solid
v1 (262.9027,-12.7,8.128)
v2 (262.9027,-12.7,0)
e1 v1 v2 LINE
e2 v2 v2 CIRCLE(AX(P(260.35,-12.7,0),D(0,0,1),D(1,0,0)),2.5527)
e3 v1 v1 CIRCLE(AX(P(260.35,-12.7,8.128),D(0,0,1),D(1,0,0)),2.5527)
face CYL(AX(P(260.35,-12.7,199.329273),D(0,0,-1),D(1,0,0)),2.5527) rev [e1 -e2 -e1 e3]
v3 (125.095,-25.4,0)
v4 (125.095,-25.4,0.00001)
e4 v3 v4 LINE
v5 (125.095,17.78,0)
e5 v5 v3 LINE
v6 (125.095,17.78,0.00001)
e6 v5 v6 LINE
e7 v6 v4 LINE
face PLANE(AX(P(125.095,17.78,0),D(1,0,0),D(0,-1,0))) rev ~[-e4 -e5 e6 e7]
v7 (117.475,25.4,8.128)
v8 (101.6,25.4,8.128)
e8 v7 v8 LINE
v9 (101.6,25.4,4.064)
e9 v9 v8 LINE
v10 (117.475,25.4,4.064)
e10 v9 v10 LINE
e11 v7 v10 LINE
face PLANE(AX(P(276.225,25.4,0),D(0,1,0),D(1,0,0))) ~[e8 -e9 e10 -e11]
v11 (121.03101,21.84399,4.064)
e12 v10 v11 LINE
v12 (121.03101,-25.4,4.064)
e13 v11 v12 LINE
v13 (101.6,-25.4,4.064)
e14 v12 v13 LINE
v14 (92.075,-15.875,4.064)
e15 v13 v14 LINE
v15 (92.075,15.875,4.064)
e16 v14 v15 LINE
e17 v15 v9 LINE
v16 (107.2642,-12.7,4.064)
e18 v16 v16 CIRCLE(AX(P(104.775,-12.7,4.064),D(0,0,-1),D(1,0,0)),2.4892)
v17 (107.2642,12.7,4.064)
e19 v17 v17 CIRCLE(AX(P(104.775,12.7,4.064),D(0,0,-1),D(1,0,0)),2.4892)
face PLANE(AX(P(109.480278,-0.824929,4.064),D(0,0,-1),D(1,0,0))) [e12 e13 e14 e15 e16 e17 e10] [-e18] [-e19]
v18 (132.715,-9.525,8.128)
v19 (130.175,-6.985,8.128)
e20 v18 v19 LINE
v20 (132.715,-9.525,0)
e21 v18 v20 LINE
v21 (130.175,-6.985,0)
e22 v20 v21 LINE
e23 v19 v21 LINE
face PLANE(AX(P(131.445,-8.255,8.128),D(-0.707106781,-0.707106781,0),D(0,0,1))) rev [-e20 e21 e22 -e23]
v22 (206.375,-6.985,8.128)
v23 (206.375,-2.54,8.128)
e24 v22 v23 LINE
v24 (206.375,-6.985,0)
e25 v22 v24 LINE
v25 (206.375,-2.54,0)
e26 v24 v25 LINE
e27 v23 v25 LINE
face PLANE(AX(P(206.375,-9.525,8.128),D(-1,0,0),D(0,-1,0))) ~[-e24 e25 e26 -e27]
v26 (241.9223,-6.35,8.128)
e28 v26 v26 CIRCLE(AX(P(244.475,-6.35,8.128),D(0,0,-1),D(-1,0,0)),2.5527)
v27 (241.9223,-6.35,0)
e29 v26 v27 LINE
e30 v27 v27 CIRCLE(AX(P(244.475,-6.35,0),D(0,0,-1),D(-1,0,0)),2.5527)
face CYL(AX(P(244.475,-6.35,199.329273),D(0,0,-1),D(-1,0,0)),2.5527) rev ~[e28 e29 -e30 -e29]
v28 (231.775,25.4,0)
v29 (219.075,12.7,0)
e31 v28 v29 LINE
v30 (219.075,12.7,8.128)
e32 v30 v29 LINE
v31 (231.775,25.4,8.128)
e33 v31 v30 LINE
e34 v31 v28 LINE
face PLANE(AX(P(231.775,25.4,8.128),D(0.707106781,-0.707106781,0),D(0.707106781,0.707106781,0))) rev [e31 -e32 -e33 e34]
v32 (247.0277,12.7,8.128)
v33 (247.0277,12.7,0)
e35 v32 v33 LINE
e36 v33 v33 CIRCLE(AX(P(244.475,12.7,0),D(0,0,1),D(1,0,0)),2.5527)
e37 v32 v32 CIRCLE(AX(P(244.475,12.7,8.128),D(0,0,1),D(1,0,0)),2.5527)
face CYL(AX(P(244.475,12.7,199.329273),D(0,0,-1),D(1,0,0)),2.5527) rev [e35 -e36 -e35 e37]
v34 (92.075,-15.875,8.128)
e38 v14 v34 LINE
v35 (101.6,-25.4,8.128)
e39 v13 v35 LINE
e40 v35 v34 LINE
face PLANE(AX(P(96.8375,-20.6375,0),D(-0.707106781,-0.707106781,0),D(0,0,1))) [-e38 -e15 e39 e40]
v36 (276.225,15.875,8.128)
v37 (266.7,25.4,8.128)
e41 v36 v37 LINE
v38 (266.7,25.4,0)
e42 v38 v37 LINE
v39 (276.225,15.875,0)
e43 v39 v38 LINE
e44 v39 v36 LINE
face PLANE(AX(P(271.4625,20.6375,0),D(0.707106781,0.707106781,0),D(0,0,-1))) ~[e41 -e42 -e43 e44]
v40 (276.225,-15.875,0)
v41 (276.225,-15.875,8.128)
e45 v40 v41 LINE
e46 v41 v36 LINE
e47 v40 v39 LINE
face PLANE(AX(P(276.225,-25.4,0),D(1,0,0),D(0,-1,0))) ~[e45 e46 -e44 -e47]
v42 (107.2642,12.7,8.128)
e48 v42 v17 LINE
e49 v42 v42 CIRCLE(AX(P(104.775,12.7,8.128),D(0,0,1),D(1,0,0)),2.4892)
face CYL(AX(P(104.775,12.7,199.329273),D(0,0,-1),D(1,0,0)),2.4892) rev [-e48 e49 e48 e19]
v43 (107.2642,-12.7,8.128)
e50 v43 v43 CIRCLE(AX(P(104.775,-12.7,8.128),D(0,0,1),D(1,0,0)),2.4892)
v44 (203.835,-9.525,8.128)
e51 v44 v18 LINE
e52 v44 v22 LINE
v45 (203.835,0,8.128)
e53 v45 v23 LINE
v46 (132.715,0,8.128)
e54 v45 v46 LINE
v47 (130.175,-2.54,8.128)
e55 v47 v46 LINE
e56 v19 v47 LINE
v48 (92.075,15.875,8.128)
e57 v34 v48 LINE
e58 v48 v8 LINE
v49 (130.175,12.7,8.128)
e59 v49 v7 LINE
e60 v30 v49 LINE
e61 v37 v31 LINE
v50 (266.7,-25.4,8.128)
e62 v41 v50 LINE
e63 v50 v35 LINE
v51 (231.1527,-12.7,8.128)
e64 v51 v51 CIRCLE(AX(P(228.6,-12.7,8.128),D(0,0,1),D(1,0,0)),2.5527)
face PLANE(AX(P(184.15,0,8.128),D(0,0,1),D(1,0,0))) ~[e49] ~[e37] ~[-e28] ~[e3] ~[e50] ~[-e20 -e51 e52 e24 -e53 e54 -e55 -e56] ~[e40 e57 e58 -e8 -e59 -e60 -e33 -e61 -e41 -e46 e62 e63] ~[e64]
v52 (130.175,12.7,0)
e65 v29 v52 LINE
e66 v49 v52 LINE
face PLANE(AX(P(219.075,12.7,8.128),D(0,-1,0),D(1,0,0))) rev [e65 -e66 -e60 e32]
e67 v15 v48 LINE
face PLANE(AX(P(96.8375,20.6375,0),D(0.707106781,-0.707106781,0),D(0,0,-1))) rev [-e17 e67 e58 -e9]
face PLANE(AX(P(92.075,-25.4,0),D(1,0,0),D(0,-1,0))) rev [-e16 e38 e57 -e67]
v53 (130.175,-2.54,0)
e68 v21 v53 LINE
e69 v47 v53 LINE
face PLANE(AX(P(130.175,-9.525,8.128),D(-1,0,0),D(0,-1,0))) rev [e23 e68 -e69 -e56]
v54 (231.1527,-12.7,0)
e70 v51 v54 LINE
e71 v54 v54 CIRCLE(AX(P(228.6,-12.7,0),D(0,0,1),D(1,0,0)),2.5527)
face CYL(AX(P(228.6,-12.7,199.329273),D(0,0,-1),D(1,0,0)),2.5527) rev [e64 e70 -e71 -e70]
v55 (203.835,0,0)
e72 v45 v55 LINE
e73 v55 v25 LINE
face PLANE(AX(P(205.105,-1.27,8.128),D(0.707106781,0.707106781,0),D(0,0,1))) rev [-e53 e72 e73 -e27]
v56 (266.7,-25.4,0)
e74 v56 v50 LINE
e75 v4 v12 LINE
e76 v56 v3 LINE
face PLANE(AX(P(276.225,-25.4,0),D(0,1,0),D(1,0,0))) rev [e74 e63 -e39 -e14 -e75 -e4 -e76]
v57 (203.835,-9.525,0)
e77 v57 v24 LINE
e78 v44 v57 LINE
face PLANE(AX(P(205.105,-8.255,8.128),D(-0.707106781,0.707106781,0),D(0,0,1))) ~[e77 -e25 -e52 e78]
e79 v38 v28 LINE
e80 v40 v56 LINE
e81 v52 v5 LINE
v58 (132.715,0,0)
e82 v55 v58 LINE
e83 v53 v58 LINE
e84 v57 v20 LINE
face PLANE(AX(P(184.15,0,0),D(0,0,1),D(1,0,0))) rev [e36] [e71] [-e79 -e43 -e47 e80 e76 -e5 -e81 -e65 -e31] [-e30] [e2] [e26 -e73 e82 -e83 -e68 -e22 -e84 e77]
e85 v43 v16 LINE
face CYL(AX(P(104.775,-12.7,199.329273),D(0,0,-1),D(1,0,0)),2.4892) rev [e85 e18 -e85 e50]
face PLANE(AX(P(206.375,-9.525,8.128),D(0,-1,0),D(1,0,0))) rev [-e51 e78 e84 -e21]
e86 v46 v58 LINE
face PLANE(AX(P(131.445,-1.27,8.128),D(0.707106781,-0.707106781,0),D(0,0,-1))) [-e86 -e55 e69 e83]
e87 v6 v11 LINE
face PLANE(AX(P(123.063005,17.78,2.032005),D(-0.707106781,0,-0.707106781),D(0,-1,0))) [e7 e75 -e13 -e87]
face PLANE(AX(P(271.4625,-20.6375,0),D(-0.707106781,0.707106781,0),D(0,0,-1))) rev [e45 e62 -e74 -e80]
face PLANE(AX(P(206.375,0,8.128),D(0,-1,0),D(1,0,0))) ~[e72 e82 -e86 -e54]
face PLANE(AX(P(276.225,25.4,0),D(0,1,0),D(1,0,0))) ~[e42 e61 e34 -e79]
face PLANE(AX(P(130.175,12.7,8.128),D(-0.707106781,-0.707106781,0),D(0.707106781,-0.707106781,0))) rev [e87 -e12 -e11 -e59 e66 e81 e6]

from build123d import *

# Parameters (mm, degrees)
F0_W      = 184.15
F0_H      = 50.8
F1_DEPTH  = 8.128
F3_D      = 5.1054
F6_D      = 4.9784
F7_W      = 76.2
F7_H      = 9.525
F8_DEPTH  = 8.129
F9_SIZE   = 9.525
F10_SIZE  = 2.54
F15_DEPTH = 25.4
F17_D     = 5.1054
F18_R     = 2.4892
F19_DEPTH = 4.064
F20_SIZE  = 4.06399


# Not quite as in the source:
# - a fillet or chamfer is up to 0.001 mm smaller than in the source, because OpenCascade refuses the exact size
# - a feature names something its author has since deleted; it is built from what else it names


with BuildPart() as f1:
    # F0 (on Top) → F1 (new body)
    with BuildSketch(Plane.XY):
        Rectangle(F0_W, F0_H)
    extrude(amount=F1_DEPTH)

    # F3 (through all)
    with Locations(Plane.XY.offset(8.128)):
        with Locations((-60.325, 12.7), (-76.2, -12.7), (-44.45, -12.7)):
            Hole(F3_D / 2)

    # F6 (through all)
    with Locations(Plane.XY.offset(8.128)):
        with Locations((79.375, 12.7), (79.375, -12.7)):
            Hole(F6_D / 2)

    # F7 (on face) → F8 (cut, through all)
    with BuildSketch(Plane.XY.offset(8.128)):
        Polygon((66.675, 25.4), (-47.625, 25.4), (-34.925, 12.7), (53.975, 12.7), align=None)
        with Locations((15.875, -4.7625)):
            Rectangle(F7_W, F7_H)
    extrude(amount=-F8_DEPTH, mode=Mode.SUBTRACT)

    # F9
    f9_edges = [f1.edges().sort_by_distance(p)[0] for p in [
        (-92.075, -25.4, 4.064),
        (-92.075, 25.4, 4.064),
        (92.075, -25.4, 4.064),
        (92.075, 25.4, 4.064),
    ]]
    chamfer(f9_edges, length=F9_SIZE)

    # F10
    f10_edges = [f1.edges().sort_by_distance(p)[0] for p in [
        (-22.225, 0, 4.064),
        (-22.225, -9.525, 4.064),
        (53.975, 0, 4.064),
        (53.975, -9.525, 4.064),
    ]]
    chamfer(f10_edges, length=F10_SIZE)


with BuildPart() as f13_1:
    # F13: instance of F1
    add(f1.part.mirror(Plane(origin=(92.075, 0, 4.064), x_dir=(0, 1, 0), z_dir=(1, 0, 0))))

    # F17 (through all)
    with Locations(Plane.XY.offset(8.128)):
        with Locations((244.475, -6.35)):
            Hole(F17_D / 2)

    # F18 (on face) → F19 (cut)
    with BuildSketch(Plane(origin=(0, 0, 0), x_dir=(1, 0, 0), z_dir=(0, 0, -1))):
        Polygon((125.095, 25.4), (117.475, 25.4), (101.6, 25.4), (92.075, 15.875), (92.075, -15.875), (101.6, -25.4), (117.475, -25.4), (125.095, -17.78), align=None)
        with Locations((104.775, -12.7)):
            Circle(F18_R, mode=Mode.SUBTRACT)
        with Locations((104.775, 12.7)):
            Circle(F18_R, mode=Mode.SUBTRACT)
    extrude(amount=-F19_DEPTH, mode=Mode.SUBTRACT)

    # F20 (size 4.064 in the source; OpenCascade refuses exactly that, so slightly less here)
    f20_edges = [f13_1.edges().sort_by_distance(p)[0] for p in [
        (125.095, -3.81, 4.064),
    ]]
    chamfer(f20_edges, length=F20_SIZE)


with BuildPart() as f1_1:
    add(f1.part)

    # F14 (on face) → F15 (cut)
    with BuildSketch(Plane.XY.offset(8.128)):
        Polygon((-100.5587801337, -25.4), (92.075, -25.4), (92.075, -15.875), (92.075, 15.875), (92.075, 34.0131297708), (-100.5587801337, 34.0131297708), align=None)
    extrude(amount=-F15_DEPTH, mode=Mode.SUBTRACT)


solid = f13_1.part
